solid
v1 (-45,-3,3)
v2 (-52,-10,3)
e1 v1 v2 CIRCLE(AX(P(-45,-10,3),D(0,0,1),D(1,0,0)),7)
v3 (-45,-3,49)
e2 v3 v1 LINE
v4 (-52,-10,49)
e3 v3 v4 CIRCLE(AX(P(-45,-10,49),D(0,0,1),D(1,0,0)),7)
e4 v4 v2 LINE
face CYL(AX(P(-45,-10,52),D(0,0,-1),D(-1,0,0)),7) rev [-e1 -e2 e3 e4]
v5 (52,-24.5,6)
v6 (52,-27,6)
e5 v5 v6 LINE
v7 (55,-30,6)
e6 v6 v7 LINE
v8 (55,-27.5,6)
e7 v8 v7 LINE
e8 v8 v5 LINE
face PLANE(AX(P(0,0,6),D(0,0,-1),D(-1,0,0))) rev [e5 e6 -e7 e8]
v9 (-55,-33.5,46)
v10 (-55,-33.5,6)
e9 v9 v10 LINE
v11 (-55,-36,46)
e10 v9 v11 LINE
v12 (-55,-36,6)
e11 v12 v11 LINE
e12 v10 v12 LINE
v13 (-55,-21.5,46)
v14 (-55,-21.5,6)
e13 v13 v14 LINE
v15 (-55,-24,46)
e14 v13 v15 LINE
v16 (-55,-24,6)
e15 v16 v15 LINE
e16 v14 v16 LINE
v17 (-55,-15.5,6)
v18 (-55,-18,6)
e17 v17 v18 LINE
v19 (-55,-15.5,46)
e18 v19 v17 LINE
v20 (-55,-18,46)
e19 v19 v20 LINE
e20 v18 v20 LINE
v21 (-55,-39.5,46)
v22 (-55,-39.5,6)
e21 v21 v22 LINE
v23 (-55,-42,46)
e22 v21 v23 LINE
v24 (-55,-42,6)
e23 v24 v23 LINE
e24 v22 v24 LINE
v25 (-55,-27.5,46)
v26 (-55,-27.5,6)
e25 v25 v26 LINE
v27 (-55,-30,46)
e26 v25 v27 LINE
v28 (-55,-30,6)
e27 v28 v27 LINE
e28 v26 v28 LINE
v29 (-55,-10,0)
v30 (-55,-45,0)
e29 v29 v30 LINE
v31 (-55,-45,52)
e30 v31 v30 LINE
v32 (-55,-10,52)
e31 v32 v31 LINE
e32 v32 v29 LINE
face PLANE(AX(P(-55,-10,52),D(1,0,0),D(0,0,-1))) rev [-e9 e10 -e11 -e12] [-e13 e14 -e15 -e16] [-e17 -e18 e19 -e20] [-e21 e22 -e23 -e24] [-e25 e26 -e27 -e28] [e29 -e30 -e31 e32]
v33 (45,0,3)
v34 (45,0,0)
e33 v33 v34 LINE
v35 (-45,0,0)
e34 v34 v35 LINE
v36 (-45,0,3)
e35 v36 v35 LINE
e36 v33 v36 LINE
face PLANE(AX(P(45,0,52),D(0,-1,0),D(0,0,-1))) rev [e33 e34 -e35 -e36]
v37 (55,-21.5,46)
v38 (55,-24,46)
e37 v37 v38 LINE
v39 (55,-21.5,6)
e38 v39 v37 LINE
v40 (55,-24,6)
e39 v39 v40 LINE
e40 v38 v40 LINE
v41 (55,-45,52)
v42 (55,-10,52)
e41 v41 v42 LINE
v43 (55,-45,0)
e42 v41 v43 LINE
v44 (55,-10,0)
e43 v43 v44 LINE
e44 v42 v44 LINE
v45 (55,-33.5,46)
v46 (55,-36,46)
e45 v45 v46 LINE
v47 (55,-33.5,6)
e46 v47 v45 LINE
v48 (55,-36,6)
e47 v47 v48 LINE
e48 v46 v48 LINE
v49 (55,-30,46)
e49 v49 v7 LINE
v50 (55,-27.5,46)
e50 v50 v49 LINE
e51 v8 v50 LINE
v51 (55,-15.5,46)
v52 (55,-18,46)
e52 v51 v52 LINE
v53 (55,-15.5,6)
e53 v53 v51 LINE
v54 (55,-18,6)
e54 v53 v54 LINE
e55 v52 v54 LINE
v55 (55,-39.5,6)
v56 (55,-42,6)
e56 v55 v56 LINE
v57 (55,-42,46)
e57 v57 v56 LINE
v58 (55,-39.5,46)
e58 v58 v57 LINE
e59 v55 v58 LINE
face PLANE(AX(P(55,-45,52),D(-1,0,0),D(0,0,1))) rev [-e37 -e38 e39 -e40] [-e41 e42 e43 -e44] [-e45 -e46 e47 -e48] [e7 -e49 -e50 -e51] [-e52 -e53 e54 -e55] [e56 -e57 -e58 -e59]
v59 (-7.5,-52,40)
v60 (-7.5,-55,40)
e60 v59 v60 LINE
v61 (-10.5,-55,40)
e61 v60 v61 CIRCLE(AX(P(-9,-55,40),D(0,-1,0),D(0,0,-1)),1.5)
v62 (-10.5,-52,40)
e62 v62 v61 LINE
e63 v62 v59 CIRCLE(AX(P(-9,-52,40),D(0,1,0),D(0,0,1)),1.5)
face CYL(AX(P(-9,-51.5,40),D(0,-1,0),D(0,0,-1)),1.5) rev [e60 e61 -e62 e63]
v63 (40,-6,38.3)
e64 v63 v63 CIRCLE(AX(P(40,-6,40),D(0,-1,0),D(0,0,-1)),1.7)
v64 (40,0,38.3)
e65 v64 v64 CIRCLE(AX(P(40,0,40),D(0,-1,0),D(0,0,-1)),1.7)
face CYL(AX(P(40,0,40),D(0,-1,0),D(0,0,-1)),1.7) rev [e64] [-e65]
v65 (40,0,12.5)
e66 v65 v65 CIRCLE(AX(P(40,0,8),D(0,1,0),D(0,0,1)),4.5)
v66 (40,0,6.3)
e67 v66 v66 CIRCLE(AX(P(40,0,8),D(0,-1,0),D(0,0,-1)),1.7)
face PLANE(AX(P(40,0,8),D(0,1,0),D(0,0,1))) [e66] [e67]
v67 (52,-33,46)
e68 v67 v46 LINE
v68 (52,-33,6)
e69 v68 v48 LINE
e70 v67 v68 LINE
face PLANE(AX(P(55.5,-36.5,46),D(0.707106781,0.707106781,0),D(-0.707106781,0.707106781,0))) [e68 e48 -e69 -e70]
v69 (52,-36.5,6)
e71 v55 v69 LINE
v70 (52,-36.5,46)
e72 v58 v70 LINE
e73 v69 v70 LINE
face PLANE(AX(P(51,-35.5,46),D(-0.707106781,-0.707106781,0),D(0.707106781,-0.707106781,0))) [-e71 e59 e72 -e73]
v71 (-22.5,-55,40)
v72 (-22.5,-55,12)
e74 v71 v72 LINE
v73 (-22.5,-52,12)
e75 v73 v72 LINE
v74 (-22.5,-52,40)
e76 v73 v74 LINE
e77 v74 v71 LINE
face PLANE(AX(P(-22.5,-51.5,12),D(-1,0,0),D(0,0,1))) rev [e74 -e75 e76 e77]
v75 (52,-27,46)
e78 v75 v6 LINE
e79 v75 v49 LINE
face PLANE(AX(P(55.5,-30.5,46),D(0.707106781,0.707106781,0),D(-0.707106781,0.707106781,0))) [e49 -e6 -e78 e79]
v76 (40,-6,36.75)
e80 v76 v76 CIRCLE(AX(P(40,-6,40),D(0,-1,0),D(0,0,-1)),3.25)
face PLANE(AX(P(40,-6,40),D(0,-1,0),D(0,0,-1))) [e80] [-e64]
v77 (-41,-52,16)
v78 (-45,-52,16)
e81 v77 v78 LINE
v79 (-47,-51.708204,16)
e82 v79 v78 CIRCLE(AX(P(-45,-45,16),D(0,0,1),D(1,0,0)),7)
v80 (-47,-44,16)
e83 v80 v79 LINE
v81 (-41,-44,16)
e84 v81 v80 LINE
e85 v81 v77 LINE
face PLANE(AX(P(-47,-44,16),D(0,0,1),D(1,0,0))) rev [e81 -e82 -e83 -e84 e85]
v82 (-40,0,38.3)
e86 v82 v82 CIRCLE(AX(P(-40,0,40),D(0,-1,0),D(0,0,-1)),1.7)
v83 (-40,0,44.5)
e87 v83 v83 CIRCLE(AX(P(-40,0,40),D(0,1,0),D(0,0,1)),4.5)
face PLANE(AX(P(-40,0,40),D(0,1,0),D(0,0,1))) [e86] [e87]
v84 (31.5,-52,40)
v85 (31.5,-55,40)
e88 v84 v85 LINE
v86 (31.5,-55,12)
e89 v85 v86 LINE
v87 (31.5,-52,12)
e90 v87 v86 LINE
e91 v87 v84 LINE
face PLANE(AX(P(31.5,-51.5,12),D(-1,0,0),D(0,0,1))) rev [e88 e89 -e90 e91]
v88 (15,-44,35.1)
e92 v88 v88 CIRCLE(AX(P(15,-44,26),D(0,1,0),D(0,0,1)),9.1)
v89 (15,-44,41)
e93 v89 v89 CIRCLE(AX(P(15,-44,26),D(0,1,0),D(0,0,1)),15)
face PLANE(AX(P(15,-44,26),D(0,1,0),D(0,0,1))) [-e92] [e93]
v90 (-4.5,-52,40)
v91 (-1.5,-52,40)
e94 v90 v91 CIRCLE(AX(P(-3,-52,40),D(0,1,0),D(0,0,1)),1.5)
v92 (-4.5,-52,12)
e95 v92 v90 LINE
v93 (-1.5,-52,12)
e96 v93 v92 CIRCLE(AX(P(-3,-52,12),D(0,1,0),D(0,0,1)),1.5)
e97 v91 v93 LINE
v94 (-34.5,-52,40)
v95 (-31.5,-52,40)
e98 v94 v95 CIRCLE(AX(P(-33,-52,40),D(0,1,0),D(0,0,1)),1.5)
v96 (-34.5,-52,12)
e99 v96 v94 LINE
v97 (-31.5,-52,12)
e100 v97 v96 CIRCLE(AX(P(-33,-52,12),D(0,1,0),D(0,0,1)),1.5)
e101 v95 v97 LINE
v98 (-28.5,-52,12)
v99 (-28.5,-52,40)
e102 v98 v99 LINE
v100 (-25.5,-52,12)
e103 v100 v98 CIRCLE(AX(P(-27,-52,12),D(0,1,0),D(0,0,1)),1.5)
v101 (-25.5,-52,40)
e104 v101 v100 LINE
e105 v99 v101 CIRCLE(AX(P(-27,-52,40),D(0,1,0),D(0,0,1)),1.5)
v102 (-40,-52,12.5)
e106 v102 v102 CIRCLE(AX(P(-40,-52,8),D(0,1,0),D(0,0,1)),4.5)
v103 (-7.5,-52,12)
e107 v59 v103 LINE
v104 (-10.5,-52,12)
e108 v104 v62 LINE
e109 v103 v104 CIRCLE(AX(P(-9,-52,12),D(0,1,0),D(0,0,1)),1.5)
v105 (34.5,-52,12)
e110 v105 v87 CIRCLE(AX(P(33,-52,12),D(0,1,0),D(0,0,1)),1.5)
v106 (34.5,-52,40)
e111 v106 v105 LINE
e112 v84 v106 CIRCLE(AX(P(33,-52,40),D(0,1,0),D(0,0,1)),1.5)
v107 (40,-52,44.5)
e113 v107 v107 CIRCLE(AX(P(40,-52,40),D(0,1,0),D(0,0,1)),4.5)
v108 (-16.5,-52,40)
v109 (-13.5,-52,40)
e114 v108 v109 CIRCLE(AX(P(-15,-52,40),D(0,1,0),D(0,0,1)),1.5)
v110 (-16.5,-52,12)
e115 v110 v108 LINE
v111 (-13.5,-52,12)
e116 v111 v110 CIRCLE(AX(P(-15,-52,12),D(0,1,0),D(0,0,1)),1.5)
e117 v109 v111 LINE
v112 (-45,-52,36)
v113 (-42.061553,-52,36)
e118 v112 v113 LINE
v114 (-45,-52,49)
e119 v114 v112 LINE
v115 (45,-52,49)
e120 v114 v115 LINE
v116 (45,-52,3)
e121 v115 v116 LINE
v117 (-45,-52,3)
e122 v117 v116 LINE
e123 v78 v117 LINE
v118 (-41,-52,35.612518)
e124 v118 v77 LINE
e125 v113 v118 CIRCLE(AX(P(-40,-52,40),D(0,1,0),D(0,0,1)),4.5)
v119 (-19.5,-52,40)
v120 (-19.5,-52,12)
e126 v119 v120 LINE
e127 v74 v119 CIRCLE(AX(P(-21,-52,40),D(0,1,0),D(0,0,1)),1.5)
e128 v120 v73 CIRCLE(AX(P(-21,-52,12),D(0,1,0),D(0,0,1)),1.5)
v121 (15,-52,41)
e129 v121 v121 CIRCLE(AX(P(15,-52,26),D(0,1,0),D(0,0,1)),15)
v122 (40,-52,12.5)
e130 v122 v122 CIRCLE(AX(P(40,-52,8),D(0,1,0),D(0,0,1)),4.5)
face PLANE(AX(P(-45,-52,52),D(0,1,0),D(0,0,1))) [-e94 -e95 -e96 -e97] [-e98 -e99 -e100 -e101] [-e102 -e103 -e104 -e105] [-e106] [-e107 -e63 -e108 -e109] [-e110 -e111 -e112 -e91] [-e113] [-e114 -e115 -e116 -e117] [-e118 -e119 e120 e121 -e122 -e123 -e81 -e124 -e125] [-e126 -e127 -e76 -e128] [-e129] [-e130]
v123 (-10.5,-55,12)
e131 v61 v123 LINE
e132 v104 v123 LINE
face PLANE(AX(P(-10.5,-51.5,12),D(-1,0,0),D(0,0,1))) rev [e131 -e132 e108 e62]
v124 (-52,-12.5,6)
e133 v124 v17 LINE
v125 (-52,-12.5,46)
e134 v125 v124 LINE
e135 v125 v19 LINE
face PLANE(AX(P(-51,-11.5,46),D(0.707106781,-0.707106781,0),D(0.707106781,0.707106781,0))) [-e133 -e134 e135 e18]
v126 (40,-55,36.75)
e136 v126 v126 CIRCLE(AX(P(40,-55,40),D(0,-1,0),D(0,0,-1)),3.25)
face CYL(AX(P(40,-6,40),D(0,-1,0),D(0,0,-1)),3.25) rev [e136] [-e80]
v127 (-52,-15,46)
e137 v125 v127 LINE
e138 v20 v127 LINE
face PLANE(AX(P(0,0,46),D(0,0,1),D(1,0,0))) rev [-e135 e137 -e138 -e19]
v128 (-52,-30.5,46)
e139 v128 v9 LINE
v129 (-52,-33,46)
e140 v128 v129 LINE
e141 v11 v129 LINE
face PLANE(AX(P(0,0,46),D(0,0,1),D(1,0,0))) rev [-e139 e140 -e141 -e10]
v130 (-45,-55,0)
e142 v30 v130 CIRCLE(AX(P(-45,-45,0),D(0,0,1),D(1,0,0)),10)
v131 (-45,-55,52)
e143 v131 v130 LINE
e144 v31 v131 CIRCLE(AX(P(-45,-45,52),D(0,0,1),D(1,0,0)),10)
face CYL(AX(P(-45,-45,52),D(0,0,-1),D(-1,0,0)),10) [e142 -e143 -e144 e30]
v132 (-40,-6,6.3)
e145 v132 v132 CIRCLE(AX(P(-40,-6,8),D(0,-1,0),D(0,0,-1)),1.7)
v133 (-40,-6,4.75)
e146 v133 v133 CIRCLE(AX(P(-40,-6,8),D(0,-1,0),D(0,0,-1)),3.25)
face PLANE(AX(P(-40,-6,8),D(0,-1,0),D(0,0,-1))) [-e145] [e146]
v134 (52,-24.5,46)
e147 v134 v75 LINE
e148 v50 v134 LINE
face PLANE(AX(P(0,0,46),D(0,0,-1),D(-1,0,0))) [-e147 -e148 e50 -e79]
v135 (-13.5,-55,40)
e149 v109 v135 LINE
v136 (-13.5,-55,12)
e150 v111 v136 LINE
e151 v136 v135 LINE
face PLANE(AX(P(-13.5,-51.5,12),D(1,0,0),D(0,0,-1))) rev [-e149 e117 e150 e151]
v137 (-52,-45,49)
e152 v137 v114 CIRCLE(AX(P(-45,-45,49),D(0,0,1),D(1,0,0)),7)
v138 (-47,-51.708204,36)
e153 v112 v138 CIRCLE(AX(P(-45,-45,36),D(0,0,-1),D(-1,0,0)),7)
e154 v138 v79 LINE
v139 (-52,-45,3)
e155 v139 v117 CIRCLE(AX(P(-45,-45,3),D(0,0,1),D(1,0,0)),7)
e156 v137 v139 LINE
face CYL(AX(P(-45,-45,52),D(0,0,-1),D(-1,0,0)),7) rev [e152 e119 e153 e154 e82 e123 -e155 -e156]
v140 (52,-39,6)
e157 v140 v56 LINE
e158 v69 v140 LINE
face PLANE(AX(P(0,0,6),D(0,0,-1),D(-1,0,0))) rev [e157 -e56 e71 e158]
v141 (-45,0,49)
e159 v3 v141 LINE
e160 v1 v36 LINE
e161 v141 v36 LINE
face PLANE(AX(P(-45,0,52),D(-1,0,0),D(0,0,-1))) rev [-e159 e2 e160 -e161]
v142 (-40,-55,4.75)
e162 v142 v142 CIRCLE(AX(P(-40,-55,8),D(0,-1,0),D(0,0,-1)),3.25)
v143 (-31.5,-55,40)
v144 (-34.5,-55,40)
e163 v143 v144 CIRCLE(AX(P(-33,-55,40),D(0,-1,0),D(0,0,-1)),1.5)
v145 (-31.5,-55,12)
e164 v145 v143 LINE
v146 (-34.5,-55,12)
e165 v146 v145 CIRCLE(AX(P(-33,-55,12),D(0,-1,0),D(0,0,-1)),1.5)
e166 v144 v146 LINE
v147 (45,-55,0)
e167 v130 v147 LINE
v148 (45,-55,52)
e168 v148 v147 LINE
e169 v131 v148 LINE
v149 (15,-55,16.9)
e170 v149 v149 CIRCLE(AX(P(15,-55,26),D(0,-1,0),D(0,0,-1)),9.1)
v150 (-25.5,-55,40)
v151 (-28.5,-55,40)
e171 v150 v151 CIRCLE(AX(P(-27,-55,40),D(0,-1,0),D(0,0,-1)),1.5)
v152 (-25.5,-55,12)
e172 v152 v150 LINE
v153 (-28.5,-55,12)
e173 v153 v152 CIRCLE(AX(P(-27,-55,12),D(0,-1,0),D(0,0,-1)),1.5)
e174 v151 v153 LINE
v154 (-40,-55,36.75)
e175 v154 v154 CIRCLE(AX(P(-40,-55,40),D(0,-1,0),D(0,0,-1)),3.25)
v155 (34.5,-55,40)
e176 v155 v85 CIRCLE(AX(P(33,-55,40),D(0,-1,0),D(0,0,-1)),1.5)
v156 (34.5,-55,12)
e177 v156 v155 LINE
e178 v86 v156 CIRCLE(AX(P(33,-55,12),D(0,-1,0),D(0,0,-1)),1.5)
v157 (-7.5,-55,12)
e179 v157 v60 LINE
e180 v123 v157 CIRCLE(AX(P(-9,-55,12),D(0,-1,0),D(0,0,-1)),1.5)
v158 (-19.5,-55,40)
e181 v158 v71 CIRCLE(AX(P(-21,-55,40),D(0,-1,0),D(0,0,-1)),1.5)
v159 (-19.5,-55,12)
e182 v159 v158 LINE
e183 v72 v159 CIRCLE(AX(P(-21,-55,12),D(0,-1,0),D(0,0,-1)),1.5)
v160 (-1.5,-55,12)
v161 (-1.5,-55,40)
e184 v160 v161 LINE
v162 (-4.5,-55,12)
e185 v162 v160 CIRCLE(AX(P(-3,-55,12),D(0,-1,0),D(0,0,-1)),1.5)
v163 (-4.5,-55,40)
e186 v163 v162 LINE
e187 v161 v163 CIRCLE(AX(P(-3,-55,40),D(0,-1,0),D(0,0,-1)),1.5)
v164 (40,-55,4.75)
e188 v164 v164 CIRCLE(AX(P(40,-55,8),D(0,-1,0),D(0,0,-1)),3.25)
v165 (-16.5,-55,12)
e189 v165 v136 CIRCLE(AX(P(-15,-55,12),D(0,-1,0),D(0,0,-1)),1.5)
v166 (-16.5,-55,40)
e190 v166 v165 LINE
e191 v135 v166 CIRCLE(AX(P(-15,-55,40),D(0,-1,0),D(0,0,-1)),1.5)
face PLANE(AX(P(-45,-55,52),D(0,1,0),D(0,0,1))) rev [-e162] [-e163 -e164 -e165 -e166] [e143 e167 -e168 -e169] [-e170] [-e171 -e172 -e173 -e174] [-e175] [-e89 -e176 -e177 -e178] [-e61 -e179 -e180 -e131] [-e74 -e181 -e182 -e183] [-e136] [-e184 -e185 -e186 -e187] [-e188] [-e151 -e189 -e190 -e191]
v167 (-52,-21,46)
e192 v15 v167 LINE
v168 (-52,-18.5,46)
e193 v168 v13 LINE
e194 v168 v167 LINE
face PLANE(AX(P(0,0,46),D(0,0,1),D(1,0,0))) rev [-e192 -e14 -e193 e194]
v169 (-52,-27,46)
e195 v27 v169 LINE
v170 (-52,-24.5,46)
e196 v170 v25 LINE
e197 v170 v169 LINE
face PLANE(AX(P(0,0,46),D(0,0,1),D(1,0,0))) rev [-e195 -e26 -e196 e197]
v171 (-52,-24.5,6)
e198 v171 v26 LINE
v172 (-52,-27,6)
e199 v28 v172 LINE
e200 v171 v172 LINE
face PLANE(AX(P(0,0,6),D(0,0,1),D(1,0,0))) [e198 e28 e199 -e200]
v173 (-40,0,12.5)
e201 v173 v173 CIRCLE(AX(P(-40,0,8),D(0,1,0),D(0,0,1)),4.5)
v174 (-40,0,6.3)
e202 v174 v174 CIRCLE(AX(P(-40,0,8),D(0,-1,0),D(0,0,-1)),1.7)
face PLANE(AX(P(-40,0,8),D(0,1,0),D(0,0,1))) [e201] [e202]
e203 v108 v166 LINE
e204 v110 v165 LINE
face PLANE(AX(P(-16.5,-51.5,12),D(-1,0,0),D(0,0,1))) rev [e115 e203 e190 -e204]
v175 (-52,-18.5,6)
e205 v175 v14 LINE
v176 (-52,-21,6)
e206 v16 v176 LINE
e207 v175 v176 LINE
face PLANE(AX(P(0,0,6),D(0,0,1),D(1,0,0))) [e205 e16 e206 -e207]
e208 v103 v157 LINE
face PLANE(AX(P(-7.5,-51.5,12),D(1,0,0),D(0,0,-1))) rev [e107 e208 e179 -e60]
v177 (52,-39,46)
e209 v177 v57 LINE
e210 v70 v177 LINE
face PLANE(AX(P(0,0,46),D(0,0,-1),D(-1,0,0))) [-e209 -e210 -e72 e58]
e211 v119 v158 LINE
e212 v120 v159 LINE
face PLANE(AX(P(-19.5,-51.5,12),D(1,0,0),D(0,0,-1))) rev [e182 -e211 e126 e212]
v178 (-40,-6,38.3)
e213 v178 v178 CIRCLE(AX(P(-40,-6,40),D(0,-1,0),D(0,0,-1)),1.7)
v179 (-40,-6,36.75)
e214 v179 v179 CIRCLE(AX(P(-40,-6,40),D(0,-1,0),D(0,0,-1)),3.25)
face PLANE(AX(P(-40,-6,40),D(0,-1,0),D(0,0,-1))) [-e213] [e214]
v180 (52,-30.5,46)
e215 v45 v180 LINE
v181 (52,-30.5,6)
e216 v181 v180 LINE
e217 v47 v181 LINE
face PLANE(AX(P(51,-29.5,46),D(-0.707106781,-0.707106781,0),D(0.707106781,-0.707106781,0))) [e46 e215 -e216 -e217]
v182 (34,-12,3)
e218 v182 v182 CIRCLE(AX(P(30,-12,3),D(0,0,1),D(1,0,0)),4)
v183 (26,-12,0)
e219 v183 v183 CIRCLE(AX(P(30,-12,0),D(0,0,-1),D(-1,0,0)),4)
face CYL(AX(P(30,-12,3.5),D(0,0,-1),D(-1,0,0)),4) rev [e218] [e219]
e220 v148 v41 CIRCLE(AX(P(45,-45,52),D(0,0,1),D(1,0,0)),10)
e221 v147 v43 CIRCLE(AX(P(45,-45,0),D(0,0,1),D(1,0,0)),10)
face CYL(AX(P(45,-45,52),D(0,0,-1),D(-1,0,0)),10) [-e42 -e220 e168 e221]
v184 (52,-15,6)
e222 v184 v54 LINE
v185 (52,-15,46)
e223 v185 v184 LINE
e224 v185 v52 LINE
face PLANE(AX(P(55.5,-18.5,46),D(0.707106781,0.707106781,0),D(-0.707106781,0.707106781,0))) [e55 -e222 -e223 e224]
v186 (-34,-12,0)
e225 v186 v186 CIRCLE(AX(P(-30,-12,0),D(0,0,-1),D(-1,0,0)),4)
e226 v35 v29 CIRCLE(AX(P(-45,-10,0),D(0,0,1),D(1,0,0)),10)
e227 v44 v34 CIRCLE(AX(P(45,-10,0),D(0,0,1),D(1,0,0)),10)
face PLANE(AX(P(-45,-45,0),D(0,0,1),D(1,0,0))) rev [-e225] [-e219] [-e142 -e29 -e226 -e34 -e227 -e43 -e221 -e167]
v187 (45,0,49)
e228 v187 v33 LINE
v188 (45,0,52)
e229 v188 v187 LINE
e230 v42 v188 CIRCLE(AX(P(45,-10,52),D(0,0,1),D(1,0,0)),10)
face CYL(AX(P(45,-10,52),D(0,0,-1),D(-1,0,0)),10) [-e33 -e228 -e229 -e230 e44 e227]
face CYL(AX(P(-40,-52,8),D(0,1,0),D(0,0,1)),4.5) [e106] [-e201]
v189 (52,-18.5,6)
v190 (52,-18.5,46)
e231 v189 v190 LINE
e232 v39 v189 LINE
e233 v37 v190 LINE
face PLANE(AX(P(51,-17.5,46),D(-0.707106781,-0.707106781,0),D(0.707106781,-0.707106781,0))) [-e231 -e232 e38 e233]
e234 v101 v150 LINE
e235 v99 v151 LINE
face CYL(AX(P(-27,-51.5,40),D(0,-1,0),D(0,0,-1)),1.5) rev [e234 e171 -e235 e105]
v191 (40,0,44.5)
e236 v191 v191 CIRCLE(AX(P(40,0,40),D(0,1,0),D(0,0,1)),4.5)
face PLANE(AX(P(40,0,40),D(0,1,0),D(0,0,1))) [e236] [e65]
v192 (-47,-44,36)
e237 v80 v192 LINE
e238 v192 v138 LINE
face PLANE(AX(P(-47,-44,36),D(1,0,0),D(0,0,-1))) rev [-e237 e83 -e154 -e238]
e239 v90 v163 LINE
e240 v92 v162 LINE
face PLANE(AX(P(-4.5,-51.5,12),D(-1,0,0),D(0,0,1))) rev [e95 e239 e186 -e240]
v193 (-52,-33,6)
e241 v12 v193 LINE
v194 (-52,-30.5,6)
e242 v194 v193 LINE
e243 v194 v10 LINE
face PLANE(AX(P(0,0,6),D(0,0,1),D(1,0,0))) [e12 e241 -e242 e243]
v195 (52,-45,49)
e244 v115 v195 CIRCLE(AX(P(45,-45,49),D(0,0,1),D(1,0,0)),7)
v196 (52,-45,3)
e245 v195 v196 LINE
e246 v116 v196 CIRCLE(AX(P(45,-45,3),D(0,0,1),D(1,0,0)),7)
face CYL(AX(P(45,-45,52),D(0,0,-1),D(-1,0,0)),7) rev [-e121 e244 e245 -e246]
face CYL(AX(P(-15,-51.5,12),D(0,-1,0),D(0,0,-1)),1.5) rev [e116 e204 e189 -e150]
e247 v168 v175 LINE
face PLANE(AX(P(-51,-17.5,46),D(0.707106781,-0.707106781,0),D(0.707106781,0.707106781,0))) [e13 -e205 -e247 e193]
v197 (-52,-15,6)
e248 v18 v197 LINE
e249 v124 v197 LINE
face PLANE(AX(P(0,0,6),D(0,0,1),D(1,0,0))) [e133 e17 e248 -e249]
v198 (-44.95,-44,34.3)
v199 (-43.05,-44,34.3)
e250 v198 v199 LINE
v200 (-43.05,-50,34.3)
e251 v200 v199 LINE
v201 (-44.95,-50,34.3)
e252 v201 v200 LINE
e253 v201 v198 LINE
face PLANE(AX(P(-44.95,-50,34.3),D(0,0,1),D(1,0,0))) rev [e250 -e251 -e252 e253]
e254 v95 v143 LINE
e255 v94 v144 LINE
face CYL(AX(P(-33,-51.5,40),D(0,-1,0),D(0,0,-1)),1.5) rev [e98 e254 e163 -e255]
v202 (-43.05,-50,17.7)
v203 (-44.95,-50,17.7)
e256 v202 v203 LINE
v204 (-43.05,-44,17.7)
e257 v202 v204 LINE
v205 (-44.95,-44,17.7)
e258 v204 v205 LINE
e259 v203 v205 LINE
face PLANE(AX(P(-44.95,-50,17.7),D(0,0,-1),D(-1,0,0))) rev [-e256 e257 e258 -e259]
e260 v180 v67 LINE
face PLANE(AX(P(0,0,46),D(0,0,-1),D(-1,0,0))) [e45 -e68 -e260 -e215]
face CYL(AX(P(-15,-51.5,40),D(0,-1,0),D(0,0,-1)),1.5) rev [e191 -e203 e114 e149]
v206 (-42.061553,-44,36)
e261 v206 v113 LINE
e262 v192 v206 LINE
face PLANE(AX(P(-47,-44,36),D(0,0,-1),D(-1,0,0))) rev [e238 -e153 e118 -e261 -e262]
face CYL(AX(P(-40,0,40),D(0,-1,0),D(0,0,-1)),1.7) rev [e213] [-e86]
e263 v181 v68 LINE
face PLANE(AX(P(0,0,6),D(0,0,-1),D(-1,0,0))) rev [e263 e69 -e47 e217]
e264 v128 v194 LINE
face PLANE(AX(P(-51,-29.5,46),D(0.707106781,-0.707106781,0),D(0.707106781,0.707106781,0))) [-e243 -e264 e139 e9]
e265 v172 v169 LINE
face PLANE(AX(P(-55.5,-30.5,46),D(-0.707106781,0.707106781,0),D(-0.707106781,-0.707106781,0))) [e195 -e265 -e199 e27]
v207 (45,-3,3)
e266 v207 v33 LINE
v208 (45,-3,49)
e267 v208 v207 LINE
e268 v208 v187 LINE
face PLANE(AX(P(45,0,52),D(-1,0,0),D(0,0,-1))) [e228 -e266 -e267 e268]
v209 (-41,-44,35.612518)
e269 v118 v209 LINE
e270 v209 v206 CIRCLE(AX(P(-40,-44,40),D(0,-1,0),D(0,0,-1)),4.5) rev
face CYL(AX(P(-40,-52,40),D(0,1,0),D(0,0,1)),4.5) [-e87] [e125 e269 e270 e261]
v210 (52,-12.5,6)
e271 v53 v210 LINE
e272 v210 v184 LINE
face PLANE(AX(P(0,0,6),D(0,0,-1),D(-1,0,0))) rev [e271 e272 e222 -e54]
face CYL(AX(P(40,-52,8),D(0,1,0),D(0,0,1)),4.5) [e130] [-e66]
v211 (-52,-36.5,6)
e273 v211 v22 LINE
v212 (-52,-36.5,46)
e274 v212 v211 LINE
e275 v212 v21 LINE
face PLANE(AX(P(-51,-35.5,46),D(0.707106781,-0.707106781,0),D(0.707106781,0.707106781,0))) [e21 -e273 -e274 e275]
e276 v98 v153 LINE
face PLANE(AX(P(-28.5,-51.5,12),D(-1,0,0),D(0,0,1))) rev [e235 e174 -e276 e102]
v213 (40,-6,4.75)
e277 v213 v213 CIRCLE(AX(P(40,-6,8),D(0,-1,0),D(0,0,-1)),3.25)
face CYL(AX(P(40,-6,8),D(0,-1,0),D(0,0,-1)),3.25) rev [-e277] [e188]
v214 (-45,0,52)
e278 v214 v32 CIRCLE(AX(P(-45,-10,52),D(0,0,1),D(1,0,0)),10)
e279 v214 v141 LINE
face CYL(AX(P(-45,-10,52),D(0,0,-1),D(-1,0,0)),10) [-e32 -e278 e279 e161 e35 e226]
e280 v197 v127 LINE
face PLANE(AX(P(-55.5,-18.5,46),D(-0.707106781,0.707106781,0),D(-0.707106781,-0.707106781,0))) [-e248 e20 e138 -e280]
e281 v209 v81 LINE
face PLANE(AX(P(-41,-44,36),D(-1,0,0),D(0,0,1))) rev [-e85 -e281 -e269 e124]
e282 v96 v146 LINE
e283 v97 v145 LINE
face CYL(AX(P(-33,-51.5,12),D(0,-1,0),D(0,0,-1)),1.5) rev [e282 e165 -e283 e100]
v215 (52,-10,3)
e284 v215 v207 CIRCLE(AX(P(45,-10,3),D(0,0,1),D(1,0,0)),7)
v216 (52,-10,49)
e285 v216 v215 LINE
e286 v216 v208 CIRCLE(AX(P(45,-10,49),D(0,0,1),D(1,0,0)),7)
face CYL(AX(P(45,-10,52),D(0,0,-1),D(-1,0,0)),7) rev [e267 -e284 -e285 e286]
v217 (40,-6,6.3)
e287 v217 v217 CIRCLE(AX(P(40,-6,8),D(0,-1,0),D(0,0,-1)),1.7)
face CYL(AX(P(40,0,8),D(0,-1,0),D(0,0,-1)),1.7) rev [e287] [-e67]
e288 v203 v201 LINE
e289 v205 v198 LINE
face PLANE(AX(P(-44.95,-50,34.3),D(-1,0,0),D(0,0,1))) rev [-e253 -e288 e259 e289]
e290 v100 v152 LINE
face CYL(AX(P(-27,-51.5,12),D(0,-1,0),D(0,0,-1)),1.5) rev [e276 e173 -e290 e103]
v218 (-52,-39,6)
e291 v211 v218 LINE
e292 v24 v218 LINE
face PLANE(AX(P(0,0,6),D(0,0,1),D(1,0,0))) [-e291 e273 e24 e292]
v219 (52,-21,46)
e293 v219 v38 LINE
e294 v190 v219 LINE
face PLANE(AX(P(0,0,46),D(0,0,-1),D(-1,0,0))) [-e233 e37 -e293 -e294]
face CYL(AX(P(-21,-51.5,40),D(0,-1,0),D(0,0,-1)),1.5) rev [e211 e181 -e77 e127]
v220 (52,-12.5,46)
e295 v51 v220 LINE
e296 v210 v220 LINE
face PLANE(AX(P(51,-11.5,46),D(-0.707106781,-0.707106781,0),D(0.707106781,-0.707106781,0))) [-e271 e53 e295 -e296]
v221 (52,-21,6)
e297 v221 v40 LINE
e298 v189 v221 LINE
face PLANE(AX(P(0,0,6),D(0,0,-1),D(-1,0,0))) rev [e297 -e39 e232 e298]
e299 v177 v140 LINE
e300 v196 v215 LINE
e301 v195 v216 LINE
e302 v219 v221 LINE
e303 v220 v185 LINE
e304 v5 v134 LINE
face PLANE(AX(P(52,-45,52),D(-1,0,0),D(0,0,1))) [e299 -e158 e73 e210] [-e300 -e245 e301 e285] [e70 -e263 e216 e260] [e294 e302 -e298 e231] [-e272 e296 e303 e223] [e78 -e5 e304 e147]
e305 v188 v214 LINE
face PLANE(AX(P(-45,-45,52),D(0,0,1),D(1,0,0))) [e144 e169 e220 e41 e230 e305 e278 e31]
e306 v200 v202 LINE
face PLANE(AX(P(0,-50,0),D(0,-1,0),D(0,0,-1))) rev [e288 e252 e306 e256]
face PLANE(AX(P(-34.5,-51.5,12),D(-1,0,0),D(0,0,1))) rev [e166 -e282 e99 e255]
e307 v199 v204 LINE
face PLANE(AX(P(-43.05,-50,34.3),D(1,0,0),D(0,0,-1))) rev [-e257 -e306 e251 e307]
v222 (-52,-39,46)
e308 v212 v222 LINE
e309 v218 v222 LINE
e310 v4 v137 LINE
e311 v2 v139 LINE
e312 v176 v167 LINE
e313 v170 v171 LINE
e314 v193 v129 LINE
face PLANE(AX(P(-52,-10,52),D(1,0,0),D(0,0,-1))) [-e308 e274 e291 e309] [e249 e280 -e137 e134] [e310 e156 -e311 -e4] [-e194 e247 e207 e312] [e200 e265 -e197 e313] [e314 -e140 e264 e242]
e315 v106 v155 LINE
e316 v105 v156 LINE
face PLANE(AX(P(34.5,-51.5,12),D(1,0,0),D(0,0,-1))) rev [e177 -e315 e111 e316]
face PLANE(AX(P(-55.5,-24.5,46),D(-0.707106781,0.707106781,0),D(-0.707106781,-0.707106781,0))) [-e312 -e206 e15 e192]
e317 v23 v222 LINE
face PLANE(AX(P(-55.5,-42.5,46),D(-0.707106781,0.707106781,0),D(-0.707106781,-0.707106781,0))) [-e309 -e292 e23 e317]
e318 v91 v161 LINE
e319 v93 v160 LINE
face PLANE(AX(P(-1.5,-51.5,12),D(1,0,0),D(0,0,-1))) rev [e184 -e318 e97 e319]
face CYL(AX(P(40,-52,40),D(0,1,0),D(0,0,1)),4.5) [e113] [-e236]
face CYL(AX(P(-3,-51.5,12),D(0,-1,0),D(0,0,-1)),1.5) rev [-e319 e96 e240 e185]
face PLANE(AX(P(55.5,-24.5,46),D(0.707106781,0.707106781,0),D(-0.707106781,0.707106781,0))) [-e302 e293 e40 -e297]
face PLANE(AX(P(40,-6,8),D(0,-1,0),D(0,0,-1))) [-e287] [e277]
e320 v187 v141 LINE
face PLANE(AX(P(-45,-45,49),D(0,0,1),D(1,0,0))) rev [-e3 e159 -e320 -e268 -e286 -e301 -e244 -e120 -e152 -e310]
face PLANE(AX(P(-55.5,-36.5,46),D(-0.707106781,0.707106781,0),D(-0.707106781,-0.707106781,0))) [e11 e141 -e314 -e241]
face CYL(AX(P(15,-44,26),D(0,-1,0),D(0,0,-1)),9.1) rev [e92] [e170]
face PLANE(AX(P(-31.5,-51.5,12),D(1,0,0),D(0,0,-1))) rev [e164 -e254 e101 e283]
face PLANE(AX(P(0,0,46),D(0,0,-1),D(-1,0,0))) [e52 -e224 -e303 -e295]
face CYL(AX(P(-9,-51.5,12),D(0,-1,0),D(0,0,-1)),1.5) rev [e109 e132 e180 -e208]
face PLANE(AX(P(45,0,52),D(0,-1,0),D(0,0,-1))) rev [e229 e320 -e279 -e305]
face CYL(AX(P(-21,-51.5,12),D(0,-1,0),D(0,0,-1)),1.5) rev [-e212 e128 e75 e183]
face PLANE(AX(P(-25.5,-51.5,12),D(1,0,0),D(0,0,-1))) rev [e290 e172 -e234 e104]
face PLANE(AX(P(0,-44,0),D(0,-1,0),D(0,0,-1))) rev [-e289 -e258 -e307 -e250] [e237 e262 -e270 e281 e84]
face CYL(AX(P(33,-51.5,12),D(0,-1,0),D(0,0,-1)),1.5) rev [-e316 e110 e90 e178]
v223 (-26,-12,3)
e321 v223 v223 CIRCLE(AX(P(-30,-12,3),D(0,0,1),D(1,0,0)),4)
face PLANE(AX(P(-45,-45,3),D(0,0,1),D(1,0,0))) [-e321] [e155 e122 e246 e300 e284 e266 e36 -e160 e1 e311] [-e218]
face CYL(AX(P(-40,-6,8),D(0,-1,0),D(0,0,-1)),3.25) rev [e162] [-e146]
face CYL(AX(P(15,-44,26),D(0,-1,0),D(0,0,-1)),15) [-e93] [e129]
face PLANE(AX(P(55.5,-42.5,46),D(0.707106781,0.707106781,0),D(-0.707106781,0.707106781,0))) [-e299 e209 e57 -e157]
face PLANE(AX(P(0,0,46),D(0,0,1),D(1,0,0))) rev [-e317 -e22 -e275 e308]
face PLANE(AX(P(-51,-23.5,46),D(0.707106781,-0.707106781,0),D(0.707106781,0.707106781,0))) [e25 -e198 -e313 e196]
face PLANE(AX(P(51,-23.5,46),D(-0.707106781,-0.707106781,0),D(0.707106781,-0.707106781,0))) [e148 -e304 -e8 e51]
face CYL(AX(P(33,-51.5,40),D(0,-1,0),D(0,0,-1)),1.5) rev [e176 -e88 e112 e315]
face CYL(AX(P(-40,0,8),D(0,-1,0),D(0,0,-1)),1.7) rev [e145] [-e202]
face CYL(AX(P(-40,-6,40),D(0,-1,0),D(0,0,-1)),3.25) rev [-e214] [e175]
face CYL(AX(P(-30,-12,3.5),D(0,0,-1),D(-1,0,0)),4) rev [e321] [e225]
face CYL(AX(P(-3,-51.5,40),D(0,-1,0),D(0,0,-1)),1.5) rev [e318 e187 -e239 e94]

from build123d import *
from build123d.topology import SkipClean

# Parameters (mm, degrees)
BOSS_EXTRUDE1_DEPTH     = 52
SHELL1_START            = 3
SHELL1_DEPTH            = 46
SKETCH2_R               = 4.5
BOSS_EXTRUDE2_DEPTH     = 52
SKETCH3_R               = 3.25
CUT_EXTRUDE1_DEPTH      = 49
SKETCH4_R               = 1.7
CUT_EXTRUDE2_DEPTH      = 91.166512631
CUT_EXTRUDE3_DEPTH      = 20
CUT_EXTRUDE3_DEPTH_BACK = 20
CUT_EXTRUDE4_DEPTH      = 3.5
SKETCH7_R               = 4
CUT_EXTRUDE5_DEPTH      = 3.5
SKETCH8_W               = 6
SKETCH8_H               = 20
BOSS_EXTRUDE3_DEPTH     = 8
SKETCH9_W               = 1.9
SKETCH9_H               = 16.6
CUT_EXTRUDE6_DEPTH      = 6
SKETCH10_R              = 15
SKETCH10_R_2            = 9.1
BOSS_EXTRUDE4_DEPTH     = 8
SKETCH11_R              = 9.1
CUT_EXTRUDE7_DEPTH      = 3.5


# Read off the part's stored shape, not the designer's step: Shell1
with BuildPart() as part:
    # Sketch1 → Boss-Extrude1 (new body)
    with BuildSketch(Plane.XY):
        with BuildLine():
            Line((-45, -55), (45, -55))
            ThreePointArc((45, -55), (52.071067812, -52.071067812), (55, -45))
            Line((55, -45), (55, -10))
            ThreePointArc((55, -10), (52.071067812, -2.928932188), (45, 0))
            Line((45, 0), (-45, 0))
            ThreePointArc((-45, 0), (-52.071067812, -2.928932188), (-55, -10))
            Line((-55, -10), (-55, -45))
            ThreePointArc((-55, -45), (-52.071067812, -52.071067812), (-45, -55))
        make_face()
    extrude(amount=BOSS_EXTRUDE1_DEPTH)

    # Shell1 outline → Shell1 (cut)
    with BuildSketch(Plane.XY.offset(SHELL1_START)):
        with BuildLine():
            Line((45, -3), (45, 0))
            Line((45, 0), (-45, 0))
            Line((-45, 0), (-45, -3))
            ThreePointArc((-45, -3), (-49.949747468, -5.050252532), (-52, -10))
            Line((-52, -10), (-52, -45))
            ThreePointArc((-52, -45), (-49.949747468, -49.949747468), (-45, -52))
            Line((-45, -52), (45, -52))
            ThreePointArc((45, -52), (49.949747468, -49.949747468), (52, -45))
            Line((52, -45), (52, -10))
            ThreePointArc((52, -10), (49.949747468, -5.050252532), (45, -3))
        make_face()
    extrude(amount=SHELL1_DEPTH, mode=Mode.SUBTRACT)

    # Sketch2 → Boss-Extrude2 (add)
    with BuildSketch(Plane(origin=(0, 0, 0), x_dir=(1, 0, 0), z_dir=(0, 1, 0))):
        with Locations(Location((-40, -8, 0), (0, 0, 270))):
            Circle(SKETCH2_R)
        with Locations(Location((40, -8, 0), (0, 0, 270))):
            Circle(SKETCH2_R)
        with Locations(Location((-40, -40, 0), (0, 0, 270))):
            Circle(SKETCH2_R)
        with Locations(Location((40, -40, 0), (0, 0, 270))):
            Circle(SKETCH2_R)
    extrude(amount=-BOSS_EXTRUDE2_DEPTH)

    # Sketch3 → Cut-Extrude1 (cut)
    with BuildSketch(Plane.XZ.offset(55)):
        with Locations(Location((-40, 8, 0), (0, 0, 270))):
            Circle(SKETCH3_R)
        with Locations(Location((40, 8, 0), (0, 0, 270))):
            Circle(SKETCH3_R)
        with Locations(Location((-40, 40, 0), (0, 0, 270))):
            Circle(SKETCH3_R)
        with Locations(Location((40, 40, 0), (0, 0, 270))):
            Circle(SKETCH3_R)
    extrude(amount=-CUT_EXTRUDE1_DEPTH, mode=Mode.SUBTRACT)

    # Sketch4 → Cut-Extrude2 (cut, through all)
    with BuildSketch(Plane.XZ.offset(6)):
        with Locations(Location((-40, 8, 0), (0, 0, 270))):
            Circle(SKETCH4_R)
        with Locations(Location((40, 8, 0), (0, 0, 270))):
            Circle(SKETCH4_R)
        with Locations(Location((-40, 40, 0), (0, 0, 270))):
            Circle(SKETCH4_R)
        with Locations(Location((40, 40, 0), (0, 0, 270))):
            Circle(SKETCH4_R)
    extrude(amount=-CUT_EXTRUDE2_DEPTH, mode=Mode.SUBTRACT)

    # Sketch5 → Cut-Extrude3 (cut, two sides: drawn at the far end of the back side and taken through both)
    with BuildSketch(Plane.XY.offset(26).offset(-CUT_EXTRUDE3_DEPTH_BACK)):
        Polygon((-51, -14), (-51, -11.5), (-55.5, -16), (-55.5, -18.5), align=None)
        Polygon((51, -14), (51, -11.5), (55.5, -16), (55.5, -18.5), align=None)
        Polygon((-51, -20), (-51, -17.5), (-55.5, -22), (-55.5, -24.5), align=None)
        Polygon((51, -20), (51, -17.5), (55.5, -22), (55.5, -24.5), align=None)
        Polygon((-51, -26), (-51, -23.5), (-55.5, -28), (-55.5, -30.5), align=None)
        Polygon((51, -26), (51, -23.5), (55.5, -28), (55.5, -30.5), align=None)
        Polygon((-51, -32), (-51, -29.5), (-55.5, -34), (-55.5, -36.5), align=None)
        Polygon((51, -32), (51, -29.5), (55.5, -34), (55.5, -36.5), align=None)
        Polygon((-51, -38), (-51, -35.5), (-55.5, -40), (-55.5, -42.5), align=None)
        Polygon((51, -38), (51, -35.5), (55.5, -40), (55.5, -42.5), align=None)
    extrude(amount=CUT_EXTRUDE3_DEPTH + CUT_EXTRUDE3_DEPTH_BACK, mode=Mode.SUBTRACT)

    # Sketch6 → Cut-Extrude4 (cut)
    with BuildSketch(Plane.XZ.offset(55)):
        with BuildLine():
            Line((-34.5, 12), (-34.5, 40))
            ThreePointArc((-34.5, 40), (-33, 41.5), (-31.5, 40))
            Line((-31.5, 40), (-31.5, 12))
            ThreePointArc((-31.5, 12), (-33, 10.5), (-34.5, 12))
        make_face()
        with BuildLine():
            Line((-28.5, 12), (-28.5, 40))
            ThreePointArc((-28.5, 40), (-27, 41.5), (-25.5, 40))
            Line((-25.5, 40), (-25.5, 12))
            ThreePointArc((-25.5, 12), (-27, 10.5), (-28.5, 12))
        make_face()
        with BuildLine():
            Line((-22.5, 12), (-22.5, 40))
            ThreePointArc((-22.5, 40), (-21, 41.5), (-19.5, 40))
            Line((-19.5, 40), (-19.5, 12))
            ThreePointArc((-19.5, 12), (-21, 10.5), (-22.5, 12))
        make_face()
        with BuildLine():
            Line((-16.5, 12), (-16.5, 40))
            ThreePointArc((-16.5, 40), (-15, 41.5), (-13.5, 40))
            Line((-13.5, 40), (-13.5, 12))
            ThreePointArc((-13.5, 12), (-15, 10.5), (-16.5, 12))
        make_face()
        with BuildLine():
            Line((-10.5, 12), (-10.5, 40))
            ThreePointArc((-10.5, 40), (-9, 41.5), (-7.5, 40))
            Line((-7.5, 40), (-7.5, 12))
            ThreePointArc((-7.5, 12), (-9, 10.5), (-10.5, 12))
        make_face()
        with BuildLine():
            Line((-4.5, 12), (-4.5, 40))
            ThreePointArc((-4.5, 40), (-3, 41.5), (-1.5, 40))
            Line((-1.5, 40), (-1.5, 12))
            ThreePointArc((-1.5, 12), (-3, 10.5), (-4.5, 12))
        make_face()
        with BuildLine():
            Line((31.5, 12), (31.5, 40))
            ThreePointArc((31.5, 40), (33, 41.5), (34.5, 40))
            Line((34.5, 40), (34.5, 12))
            ThreePointArc((34.5, 12), (33, 10.5), (31.5, 12))
        make_face()
    extrude(amount=-CUT_EXTRUDE4_DEPTH, mode=Mode.SUBTRACT)

    # Sketch7 → Cut-Extrude5 (cut)
    with BuildSketch(Plane(origin=(0, 0, 0), x_dir=(-1, 0, 0), z_dir=(0, 0, -1))):
        with Locations((30, -12)):
            Circle(SKETCH7_R)
        with Locations((-30, -12)):
            Circle(SKETCH7_R)
    extrude(amount=-CUT_EXTRUDE5_DEPTH, mode=Mode.SUBTRACT)

    # Sketch8 → Boss-Extrude3 (add)
    with BuildSketch(Plane(origin=(0, -52, 0), x_dir=(1, 0, 0), z_dir=(0, 1, 0))):
        with Locations((-44, -26)):
            Rectangle(SKETCH8_W, SKETCH8_H)
    extrude(amount=BOSS_EXTRUDE3_DEPTH)

    # Sketch9 → Cut-Extrude6 (cut)
    with BuildSketch(Plane(origin=(0, -44, 0), x_dir=(1, 0, 0), z_dir=(0, 1, 0))):
        with Locations((-44, -26)):
            Rectangle(SKETCH9_W, SKETCH9_H)
    extrude(amount=-CUT_EXTRUDE6_DEPTH, mode=Mode.SUBTRACT)

    # Sketch10 → Boss-Extrude4 (add)
    with BuildSketch(Plane(origin=(0, -52, 0), x_dir=(1, 0, 0), z_dir=(0, 1, 0))):
        with Locations(Location((15, -26, 0), (0, 0, 270))):
            Circle(SKETCH10_R)
        with Locations(Location((15, -26, 0), (0, 0, 270))):
            Circle(SKETCH10_R_2, mode=Mode.SUBTRACT)
    extrude(amount=BOSS_EXTRUDE4_DEPTH)

    # Sketch11 → Cut-Extrude7 (cut)
    with SkipClean():  # the faces are left unmerged after this step: merging them gives an invalid solid
        with BuildSketch(Plane.XZ.offset(55)):
            with Locations(Location((15, 26, 0), (0, 0, 270))):
                Circle(SKETCH11_R)
        extrude(amount=-CUT_EXTRUDE7_DEPTH, mode=Mode.SUBTRACT)


solid = part.part
